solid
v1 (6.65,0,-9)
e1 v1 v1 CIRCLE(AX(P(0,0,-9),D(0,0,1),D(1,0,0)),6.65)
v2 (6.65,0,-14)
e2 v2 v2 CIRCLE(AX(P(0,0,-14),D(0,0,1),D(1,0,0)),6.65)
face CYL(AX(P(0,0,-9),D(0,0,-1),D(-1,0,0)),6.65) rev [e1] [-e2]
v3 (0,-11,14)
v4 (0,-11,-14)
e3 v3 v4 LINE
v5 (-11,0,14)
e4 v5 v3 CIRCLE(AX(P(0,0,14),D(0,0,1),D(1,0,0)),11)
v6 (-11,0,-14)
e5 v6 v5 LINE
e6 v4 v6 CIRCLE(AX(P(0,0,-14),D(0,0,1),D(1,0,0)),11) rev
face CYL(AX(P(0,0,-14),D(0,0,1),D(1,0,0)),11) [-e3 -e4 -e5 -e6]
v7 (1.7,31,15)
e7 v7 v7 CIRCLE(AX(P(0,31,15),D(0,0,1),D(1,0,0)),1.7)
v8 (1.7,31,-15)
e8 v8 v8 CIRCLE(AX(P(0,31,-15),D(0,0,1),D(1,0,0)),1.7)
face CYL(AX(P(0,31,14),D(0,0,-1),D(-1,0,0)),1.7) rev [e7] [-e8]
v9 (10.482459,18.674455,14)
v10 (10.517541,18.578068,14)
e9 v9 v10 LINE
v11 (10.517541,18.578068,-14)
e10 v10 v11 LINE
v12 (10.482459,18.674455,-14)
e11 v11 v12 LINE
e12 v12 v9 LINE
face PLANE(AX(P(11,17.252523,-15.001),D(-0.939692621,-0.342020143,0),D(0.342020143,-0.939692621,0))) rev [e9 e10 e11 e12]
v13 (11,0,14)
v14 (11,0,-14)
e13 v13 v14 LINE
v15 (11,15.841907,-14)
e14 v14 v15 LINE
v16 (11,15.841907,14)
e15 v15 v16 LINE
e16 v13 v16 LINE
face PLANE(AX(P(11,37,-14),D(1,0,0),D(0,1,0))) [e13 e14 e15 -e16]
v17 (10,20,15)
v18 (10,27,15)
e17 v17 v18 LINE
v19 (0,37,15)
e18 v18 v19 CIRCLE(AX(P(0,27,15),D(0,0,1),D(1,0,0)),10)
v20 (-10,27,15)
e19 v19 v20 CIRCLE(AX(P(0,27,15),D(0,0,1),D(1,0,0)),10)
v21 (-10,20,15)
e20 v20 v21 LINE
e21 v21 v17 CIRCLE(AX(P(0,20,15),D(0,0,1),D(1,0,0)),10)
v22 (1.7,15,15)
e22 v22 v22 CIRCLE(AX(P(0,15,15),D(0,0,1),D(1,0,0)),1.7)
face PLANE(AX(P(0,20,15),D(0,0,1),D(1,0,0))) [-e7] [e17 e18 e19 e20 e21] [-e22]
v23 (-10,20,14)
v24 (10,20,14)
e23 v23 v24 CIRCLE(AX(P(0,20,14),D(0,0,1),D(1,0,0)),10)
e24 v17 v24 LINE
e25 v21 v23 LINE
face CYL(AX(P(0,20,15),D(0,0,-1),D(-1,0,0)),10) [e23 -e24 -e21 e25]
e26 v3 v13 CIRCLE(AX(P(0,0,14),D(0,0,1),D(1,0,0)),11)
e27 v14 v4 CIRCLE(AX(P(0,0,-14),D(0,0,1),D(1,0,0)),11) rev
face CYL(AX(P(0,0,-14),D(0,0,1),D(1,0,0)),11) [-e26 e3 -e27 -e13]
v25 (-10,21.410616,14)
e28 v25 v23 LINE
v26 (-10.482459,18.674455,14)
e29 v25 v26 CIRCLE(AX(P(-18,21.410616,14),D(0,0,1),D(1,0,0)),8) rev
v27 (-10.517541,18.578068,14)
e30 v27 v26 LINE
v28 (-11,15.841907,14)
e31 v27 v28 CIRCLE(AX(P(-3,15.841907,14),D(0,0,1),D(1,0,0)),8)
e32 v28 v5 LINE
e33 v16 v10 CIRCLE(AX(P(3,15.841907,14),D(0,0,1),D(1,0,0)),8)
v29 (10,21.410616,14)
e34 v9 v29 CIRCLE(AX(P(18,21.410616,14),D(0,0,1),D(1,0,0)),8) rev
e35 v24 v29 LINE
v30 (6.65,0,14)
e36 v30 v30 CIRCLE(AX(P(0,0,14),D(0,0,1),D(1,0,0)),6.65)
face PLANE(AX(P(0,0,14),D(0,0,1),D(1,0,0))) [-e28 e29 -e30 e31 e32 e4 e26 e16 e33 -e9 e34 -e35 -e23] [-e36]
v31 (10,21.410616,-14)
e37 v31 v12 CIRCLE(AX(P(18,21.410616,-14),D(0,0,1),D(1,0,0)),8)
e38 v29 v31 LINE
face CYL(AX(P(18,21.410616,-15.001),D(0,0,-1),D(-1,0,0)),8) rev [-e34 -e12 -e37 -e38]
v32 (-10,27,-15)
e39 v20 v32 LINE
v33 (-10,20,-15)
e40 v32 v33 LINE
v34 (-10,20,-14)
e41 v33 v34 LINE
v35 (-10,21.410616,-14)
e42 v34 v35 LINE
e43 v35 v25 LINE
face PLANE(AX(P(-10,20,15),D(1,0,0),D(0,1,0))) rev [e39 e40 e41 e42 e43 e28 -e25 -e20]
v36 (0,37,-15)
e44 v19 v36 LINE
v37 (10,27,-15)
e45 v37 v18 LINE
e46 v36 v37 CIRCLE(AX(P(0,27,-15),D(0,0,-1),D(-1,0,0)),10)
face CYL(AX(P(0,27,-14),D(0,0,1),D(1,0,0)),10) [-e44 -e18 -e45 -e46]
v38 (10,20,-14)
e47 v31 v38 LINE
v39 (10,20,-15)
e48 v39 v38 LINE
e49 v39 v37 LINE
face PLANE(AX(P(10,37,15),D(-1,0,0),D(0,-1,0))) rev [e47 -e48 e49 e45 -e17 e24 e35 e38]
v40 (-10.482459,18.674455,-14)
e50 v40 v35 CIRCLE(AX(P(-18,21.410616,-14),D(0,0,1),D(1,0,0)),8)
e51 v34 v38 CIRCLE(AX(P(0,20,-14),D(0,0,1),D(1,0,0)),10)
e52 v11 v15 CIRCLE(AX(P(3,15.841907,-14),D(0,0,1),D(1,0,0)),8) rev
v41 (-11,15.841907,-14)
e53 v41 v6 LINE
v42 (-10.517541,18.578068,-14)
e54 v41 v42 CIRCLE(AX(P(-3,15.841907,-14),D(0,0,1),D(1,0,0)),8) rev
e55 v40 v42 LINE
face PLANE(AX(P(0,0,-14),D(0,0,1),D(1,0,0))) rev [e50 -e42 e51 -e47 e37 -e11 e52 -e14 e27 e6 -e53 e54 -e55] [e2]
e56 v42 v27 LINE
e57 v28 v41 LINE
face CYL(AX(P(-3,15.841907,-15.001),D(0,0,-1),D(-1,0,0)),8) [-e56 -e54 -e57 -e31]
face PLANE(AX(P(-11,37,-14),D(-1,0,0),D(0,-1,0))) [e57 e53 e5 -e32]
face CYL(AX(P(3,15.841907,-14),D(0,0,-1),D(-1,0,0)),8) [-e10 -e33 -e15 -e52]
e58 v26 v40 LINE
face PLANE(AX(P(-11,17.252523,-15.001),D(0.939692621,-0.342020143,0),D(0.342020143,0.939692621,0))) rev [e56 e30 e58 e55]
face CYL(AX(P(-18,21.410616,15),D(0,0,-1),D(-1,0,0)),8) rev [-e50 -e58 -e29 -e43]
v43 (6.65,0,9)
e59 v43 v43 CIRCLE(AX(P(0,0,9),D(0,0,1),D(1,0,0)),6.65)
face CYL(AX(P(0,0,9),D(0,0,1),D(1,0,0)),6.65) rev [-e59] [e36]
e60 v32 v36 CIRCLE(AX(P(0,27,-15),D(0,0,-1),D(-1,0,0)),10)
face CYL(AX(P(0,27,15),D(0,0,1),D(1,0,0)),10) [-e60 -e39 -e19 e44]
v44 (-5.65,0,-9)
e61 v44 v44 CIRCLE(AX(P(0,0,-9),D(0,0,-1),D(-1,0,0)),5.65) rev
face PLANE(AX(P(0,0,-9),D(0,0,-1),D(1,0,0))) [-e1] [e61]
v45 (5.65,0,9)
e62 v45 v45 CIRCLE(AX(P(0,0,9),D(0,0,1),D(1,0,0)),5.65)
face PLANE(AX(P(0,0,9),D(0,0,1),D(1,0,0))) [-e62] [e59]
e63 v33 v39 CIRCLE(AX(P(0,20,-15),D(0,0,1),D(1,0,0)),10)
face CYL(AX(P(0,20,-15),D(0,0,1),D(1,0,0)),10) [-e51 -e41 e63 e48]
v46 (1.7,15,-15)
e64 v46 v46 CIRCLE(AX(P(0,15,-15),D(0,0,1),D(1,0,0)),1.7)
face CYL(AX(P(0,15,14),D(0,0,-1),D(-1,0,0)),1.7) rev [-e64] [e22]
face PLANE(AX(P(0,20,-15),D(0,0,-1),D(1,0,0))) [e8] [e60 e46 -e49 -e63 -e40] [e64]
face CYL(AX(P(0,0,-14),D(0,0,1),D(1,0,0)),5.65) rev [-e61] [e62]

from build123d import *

# Parameters (mm, degrees)
EXTRUDE_537_DEPTH      = 14
EXTRUDE_537_DEPTH_BACK = 14
SKETCH_1_W             = 22
SKETCH_1_H             = 48
SKETCH_2_R             = 6.65
CUT_EXTRUDE_717_DEPTH  = 5
SKETCH_4_R             = 5.65
CUT_EXTRUDE_848_DEPTH  = 45.933283877
FILLET_1_R             = 11
SKETCH_5_R             = 1.7
CUT_EXTRUDE_1388_DEPTH = 48.68647607
SKETCH_9_R             = 1.7
EXTRUDE_1991_DEPTH     = 1
CUT_EXTRUDE_2402_REACH = 50.28
FILLET_2_R             = 8
FILLET_3_R             = 10


with BuildPart() as part:
    # Эскиз1 → Extrude 537 (new, two sides: drawn at the far end of the back side and taken through both)
    with BuildSketch(Plane.XY.offset(-EXTRUDE_537_DEPTH_BACK)):
        with Locations((0, 13)):
            Rectangle(SKETCH_1_W, SKETCH_1_H)
    extrude(amount=EXTRUDE_537_DEPTH + EXTRUDE_537_DEPTH_BACK)

    # Эскиз2 → Cut-Extrude 717 (cut)
    with BuildSketch(Plane.XY.offset(14)):
        Circle(SKETCH_2_R)
    cut_extrude_717 = extrude(amount=-CUT_EXTRUDE_717_DEPTH, mode=Mode.SUBTRACT)

    # Эскиз4 → Cut-Extrude 848 (cut, through all)
    with BuildSketch(Plane.XY.offset(9)):
        Circle(SKETCH_4_R)
    extrude(amount=-CUT_EXTRUDE_848_DEPTH, mode=Mode.SUBTRACT)

    # Зеркальное отражение2: Cut-Extrude 717 across plane
    add(cut_extrude_717.mirror(Plane.XY), mode=Mode.SUBTRACT)

    # Скругление1
    fillet_1_edges = [part.edges().sort_by_distance(p)[0] for p in [
        (11, -11, 0),
        (-11, -11, 0),
    ]]
    fillet(fillet_1_edges, radius=FILLET_1_R - 0.0001)  # a hair under: the kernel refuses the full size

    # Эскиз5 → Cut-Extrude 1388 (cut, through all)
    with BuildSketch(Plane(origin=(0, 0, -14), x_dir=(-1, 0, 0), z_dir=(0, 0, -1))):
        with Locations((0, 31)):
            Circle(SKETCH_5_R)
        with Locations((0, 15)):
            Circle(SKETCH_5_R)
    extrude(amount=-CUT_EXTRUDE_1388_DEPTH, mode=Mode.SUBTRACT)

    # Эскиз9 → Extrude 1991 (add)
    with BuildSketch(Plane.XY.offset(14)):
        with BuildLine():
            Line((-10, 37), (10, 37))
            Line((10, 37), (10, 20))
            ThreePointArc((10, 20), (0, 10), (-10, 20))
            Line((-10, 20), (-10, 37))
        make_face()
        with Locations(Location((0, 15, 0), (0, 0, 180))):
            Circle(SKETCH_9_R, mode=Mode.SUBTRACT)
        with Locations(Location((0, 31, 0), (0, 0, 180))):
            Circle(SKETCH_9_R, mode=Mode.SUBTRACT)
    extrude_1991 = extrude(amount=EXTRUDE_1991_DEPTH)

    # Зеркальное отражение1: Extrude 1991 across plane
    add(extrude_1991.mirror(Plane.XY))

    # Эскиз10 → Cut-Extrude 2402 (cut, up to next)
    with BuildSketch(Plane.XY.offset(14), mode=Mode.PRIVATE) as cut_extrude_2402_sk1:
        Polygon((-10, 37), (-11, 37), (-11, 17.252522581), (-10, 20), align=None)
    cut_extrude_2402_tool1 = extrude(cut_extrude_2402_sk1.sketch, amount=-CUT_EXTRUDE_2402_REACH, mode=Mode.PRIVATE) & part.part
    # Эскиз10 → Cut-Extrude 2402 (cut, up to next)
    with BuildSketch(Plane.XY.offset(14), mode=Mode.PRIVATE) as cut_extrude_2402_sk2:
        Polygon((11, 17.252522581), (10, 20), (10, 37), (11, 37), align=None)
    cut_extrude_2402_tool2 = extrude(cut_extrude_2402_sk2.sketch, amount=-CUT_EXTRUDE_2402_REACH, mode=Mode.PRIVATE) & part.part
    add(cut_extrude_2402_tool1.solids().sort_by_distance((-10.512461, 27.796012, 14))[0], mode=Mode.SUBTRACT)
    add(cut_extrude_2402_tool2.solids().sort_by_distance((10.512461, 27.796012, 14))[0], mode=Mode.SUBTRACT)

    # Скругление2
    fillet_2_edges = [part.edges().sort_by_distance(p)[0] for p in [
        (11, 17.252522581, 0),
        (10, 20, 0),
        (-10, 20, 0),
        (-11, 17.252522581, 0),
    ]]
    fillet(fillet_2_edges, radius=FILLET_2_R)

    # Скругление3
    fillet_3_edges = [part.edges().sort_by_distance(p)[0] for p in [
        (-10, 37, 0),
        (10, 37, 0),
    ]]
    fillet(fillet_3_edges, radius=FILLET_3_R - 0.0001)  # a hair under: the kernel refuses the full size


solid = part.part
